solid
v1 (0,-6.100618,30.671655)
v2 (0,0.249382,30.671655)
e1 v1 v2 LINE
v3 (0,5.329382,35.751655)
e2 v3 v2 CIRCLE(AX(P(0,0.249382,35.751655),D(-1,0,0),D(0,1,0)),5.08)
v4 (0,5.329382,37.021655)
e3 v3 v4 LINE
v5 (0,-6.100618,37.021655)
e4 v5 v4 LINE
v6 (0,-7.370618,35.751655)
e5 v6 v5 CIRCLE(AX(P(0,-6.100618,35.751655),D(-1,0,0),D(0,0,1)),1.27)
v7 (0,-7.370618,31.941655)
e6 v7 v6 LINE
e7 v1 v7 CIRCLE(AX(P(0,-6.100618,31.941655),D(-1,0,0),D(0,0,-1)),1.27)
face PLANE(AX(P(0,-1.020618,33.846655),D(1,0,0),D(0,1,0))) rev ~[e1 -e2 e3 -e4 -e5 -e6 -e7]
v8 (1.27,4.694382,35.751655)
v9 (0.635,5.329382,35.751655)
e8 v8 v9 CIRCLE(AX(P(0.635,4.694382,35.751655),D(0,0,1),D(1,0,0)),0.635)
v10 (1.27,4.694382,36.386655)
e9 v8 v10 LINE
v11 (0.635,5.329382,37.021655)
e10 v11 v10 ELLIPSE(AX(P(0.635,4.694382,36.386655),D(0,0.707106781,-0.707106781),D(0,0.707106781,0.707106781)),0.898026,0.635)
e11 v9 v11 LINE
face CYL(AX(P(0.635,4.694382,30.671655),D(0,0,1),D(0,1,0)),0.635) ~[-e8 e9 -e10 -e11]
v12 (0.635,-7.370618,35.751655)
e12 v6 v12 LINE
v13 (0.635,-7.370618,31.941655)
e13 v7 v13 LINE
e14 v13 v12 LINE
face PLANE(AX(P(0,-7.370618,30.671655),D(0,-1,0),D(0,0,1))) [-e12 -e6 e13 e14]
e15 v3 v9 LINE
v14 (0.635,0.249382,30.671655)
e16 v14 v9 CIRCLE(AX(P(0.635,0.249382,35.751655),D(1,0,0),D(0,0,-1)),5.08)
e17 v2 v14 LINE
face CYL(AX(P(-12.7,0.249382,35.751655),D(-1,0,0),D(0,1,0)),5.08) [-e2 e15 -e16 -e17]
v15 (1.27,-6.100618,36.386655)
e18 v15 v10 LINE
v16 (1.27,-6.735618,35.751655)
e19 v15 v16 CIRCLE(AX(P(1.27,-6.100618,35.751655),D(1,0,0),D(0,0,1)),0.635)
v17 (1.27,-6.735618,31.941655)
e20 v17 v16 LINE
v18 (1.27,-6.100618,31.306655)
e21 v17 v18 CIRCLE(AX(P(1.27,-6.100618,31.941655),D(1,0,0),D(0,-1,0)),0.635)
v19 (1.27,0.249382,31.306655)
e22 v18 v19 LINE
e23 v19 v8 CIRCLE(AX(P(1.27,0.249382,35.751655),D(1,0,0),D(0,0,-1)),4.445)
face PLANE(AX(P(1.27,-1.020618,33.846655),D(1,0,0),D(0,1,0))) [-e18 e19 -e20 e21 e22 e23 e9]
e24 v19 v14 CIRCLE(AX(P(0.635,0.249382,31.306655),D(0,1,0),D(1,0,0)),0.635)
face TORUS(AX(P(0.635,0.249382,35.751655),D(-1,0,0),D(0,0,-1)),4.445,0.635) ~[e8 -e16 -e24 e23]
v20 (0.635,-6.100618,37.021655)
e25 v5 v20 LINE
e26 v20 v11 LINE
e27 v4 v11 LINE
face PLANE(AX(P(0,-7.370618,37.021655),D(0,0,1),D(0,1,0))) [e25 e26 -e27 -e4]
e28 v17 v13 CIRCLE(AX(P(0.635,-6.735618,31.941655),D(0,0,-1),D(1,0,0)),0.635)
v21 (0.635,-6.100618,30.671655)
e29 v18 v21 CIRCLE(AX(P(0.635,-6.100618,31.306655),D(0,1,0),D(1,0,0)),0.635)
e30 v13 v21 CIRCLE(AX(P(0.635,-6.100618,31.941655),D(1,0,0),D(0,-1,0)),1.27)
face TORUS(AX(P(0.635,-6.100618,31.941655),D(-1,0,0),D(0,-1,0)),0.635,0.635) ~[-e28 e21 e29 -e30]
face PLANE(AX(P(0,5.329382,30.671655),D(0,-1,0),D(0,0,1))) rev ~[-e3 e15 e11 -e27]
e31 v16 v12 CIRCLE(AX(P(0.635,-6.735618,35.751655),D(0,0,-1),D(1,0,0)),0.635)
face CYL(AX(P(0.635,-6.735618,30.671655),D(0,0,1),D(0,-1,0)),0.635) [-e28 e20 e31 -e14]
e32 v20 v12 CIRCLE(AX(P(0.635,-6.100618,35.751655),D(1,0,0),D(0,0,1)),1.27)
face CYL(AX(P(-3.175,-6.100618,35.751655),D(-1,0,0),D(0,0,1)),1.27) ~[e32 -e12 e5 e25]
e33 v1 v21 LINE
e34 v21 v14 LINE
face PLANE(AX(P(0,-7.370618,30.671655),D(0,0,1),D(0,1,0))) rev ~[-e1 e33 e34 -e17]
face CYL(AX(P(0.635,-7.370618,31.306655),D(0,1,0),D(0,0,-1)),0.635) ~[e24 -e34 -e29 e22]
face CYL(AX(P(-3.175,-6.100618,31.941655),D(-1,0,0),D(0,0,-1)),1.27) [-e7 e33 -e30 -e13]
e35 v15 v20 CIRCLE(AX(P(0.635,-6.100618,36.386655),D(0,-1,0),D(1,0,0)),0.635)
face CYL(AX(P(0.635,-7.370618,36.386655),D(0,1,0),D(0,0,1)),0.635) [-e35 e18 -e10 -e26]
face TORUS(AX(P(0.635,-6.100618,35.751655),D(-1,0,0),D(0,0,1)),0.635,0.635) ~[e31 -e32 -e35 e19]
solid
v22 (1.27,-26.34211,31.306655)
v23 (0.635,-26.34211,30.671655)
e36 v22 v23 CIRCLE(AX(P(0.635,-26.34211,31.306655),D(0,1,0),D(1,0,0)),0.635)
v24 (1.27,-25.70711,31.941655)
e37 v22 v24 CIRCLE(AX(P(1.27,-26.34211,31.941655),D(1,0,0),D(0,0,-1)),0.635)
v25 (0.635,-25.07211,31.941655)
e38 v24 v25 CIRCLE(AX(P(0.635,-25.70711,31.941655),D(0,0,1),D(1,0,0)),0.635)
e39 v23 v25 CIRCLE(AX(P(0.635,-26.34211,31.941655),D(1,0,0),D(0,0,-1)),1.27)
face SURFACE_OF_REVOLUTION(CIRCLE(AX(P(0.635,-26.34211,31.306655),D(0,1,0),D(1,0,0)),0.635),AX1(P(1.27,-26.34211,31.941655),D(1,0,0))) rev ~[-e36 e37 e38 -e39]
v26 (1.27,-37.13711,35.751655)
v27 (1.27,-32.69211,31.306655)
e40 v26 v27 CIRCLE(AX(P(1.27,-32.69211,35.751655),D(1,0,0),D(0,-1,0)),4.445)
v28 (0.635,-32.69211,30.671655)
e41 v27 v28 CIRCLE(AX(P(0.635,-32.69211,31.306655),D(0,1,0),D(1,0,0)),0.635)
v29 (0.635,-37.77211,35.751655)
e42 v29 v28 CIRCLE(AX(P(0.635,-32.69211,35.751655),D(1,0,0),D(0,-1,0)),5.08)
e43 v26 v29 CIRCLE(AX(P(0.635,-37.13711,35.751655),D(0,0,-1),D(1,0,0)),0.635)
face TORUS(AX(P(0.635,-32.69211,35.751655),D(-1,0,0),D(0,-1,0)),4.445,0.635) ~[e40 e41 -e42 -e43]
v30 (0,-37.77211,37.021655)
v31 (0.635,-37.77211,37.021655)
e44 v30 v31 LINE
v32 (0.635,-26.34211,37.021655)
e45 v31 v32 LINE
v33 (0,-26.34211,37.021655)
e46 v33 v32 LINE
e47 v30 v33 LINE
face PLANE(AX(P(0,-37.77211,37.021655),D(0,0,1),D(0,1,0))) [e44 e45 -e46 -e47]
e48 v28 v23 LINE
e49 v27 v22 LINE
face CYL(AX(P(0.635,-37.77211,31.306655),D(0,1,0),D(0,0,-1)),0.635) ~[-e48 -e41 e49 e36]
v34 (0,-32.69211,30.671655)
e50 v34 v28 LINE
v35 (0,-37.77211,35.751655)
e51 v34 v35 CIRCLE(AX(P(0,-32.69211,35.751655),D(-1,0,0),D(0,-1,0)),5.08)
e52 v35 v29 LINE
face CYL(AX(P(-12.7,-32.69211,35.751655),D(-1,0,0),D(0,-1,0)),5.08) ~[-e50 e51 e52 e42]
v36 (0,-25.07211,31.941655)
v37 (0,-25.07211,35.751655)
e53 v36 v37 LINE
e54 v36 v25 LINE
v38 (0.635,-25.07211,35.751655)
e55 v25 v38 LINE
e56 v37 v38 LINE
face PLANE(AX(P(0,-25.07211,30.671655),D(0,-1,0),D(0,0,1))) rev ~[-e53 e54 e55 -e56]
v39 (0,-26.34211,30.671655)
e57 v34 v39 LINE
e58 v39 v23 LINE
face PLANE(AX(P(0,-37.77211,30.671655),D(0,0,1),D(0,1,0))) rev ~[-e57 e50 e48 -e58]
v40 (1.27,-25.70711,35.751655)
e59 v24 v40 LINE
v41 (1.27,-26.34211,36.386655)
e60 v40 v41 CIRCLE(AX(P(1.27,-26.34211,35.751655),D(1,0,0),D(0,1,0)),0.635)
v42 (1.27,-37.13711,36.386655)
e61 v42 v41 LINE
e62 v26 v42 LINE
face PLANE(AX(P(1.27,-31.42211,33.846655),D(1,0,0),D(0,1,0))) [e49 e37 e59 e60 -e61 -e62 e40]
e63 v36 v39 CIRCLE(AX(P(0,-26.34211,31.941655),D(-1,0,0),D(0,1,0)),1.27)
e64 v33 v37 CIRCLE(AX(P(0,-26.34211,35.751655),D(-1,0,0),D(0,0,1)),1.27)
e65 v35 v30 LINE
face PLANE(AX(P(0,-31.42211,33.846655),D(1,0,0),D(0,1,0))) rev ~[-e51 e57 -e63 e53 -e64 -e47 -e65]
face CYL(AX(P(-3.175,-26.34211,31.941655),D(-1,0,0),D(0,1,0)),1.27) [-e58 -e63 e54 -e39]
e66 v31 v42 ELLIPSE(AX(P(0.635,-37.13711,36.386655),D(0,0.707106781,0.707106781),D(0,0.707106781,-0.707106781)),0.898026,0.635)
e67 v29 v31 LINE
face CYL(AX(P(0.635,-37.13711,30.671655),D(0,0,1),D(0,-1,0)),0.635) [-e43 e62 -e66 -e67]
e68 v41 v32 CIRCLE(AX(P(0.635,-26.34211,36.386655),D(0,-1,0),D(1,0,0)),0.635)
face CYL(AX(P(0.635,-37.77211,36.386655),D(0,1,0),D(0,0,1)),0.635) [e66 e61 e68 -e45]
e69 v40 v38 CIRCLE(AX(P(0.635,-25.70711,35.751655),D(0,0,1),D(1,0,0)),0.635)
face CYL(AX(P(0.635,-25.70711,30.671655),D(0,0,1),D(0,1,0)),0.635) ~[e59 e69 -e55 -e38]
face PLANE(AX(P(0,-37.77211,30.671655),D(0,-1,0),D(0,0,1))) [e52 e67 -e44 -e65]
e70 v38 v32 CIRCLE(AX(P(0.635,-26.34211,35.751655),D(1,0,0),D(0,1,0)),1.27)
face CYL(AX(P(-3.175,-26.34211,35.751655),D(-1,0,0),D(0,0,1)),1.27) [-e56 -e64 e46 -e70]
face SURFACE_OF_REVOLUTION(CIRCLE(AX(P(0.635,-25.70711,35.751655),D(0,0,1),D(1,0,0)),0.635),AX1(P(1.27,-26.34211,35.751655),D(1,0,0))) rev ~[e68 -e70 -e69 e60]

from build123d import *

# Parameters (mm, degrees)
F0_W        = 12.7
F0_H        = 6.35
F1_DEPTH    = 1.27
F2_R        = 0.635
F2_2_R      = 0.635
F3_T1_DEPTH = 13.97
F3_T4_ANGLE = 90
F4_T1_DEPTH = 13.97
F4_T4_ANGLE = 90
F5_T1_DEPTH = 4.445
F5_T4_ANGLE = 90
F6_T1_DEPTH = 4.445
F6_T4_ANGLE = 90
F7_T1_DEPTH = 4.445
F7_T4_ANGLE = 90
F8_T1_DEPTH = 4.445
F8_T4_ANGLE = 90


# Not quite as in the source:
# - a fillet or chamfer that OpenCascade refuses, or shapes differently, is made with other operations: its cross-section is extruded or revolved along the edge and cut away or added


with BuildPart() as f1:
    # F0 (on Right) → F1 (new body)
    with BuildSketch(Plane.YZ):
        with Locations((-31.4221102744, 33.8466549292)):
            Rectangle(F0_W, F0_H)
    extrude(amount=F1_DEPTH)

    # F2
    f2_edges = [f1.edges().sort_by_distance(p)[0] for p in [
        (1.27, -31.42211, 37.021655),
        (1.27, -25.07211, 33.846655),
        (1.27, -31.42211, 30.671655),
        (1.27, -37.77211, 33.846655),
    ]]
    fillet(f2_edges, radius=F2_R)

    # F4: fillet of radius 5.08 on 1 edges, made by hand

    # F4_s2 → F4_t1 (cut)
    with BuildSketch(Plane.YZ.offset(-12.7)):
        with BuildLine():
            ThreePointArc((-37.7721102744, 35.7516549292), (-36.2842127229, 32.1595524808), (-32.6921102744, 30.6716549292))
            Line((-32.6921102744, 30.6716549292), (-37.7721102744, 30.6716549292))
            Line((-37.7721102744, 30.6716549292), (-37.7721102744, 35.7516549292))
        make_face()
    extrude(amount=F4_T1_DEPTH, mode=Mode.SUBTRACT)

    # F4_s3 → F4_t4 (revolve, cut)
    with BuildSketch(Plane.XY.offset(35.7516549292)):
        with BuildLine():
            ThreePointArc((1.27, -37.1371102744), (1.0840128061, -37.5861230805), (0.635, -37.7721102744))
            Line((0.635, -37.7721102744), (1.27, -37.7721102744))
            Line((1.27, -37.7721102744), (1.27, -37.1371102744))
        make_face()
    revolve(axis=Axis((1.27, -32.6921102744, 35.7516549292), (1, 0, 0)), revolution_arc=F4_T4_ANGLE, mode=Mode.SUBTRACT)

    # F5: fillet of radius 1.27 on 1 edges, made by hand

    # F5_s2 → F5_t1 (cut)
    with BuildSketch(Plane.YZ.offset(-3.175)):
        with BuildLine():
            ThreePointArc((-26.3421102744, 37.0216549292), (-25.4440846623, 36.6496805413), (-25.0721102744, 35.7516549292))
            Line((-25.0721102744, 35.7516549292), (-25.0721102744, 37.0216549292))
            Line((-25.0721102744, 37.0216549292), (-26.3421102744, 37.0216549292))
        make_face()
    extrude(amount=F5_T1_DEPTH, mode=Mode.SUBTRACT)

    # F5_s3 → F5_t4 (revolve, cut)
    with BuildSketch(Plane.XY.offset(35.7516549292)):
        with BuildLine():
            ThreePointArc((1.27, -25.7071102744), (1.0840128061, -25.2580974684), (0.635, -25.0721102744))
            Line((0.635, -25.0721102744), (1.27, -25.0721102744))
            Line((1.27, -25.0721102744), (1.27, -25.7071102744))
        make_face()
    revolve(axis=Axis((1.27, -26.3421102744, 35.7516549292), (1, 0, 0)), revolution_arc=F5_T4_ANGLE, mode=Mode.SUBTRACT)

    # F7: fillet of radius 1.27 on 1 edges, made by hand

    # F7_s2 → F7_t1 (cut)
    with BuildSketch(Plane.YZ.offset(-3.175)):
        with BuildLine():
            ThreePointArc((-25.0721102744, 31.9416549292), (-25.4440846623, 31.0436293171), (-26.3421102744, 30.6716549292))
            Line((-26.3421102744, 30.6716549292), (-25.0721102744, 30.6716549292))
            Line((-25.0721102744, 30.6716549292), (-25.0721102744, 31.9416549292))
        make_face()
    extrude(amount=F7_T1_DEPTH, mode=Mode.SUBTRACT)

    # F7_s3 → F7_t4 (revolve, cut)
    with BuildSketch(Plane.XZ.offset(26.3421102744)):
        with BuildLine():
            ThreePointArc((1.27, 31.3066549292), (1.0840128061, 30.8576421232), (0.635, 30.6716549292))
            Line((0.635, 30.6716549292), (1.27, 30.6716549292))
            Line((1.27, 30.6716549292), (1.27, 31.3066549292))
        make_face()
    revolve(axis=Axis((1.27, -26.3421102744, 31.9416549292), (1, 0, 0)), revolution_arc=F7_T4_ANGLE, mode=Mode.SUBTRACT)


with BuildPart() as f1b:
    # F0 (on Right) → F1, piece 2 (new body)
    with BuildSketch(Plane.YZ):
        with Locations((-1.0206177063, 33.8466549292)):
            Rectangle(F0_W, F0_H)
    extrude(amount=F1_DEPTH)

    # F2#2
    f2_2_edges = [f1b.edges().sort_by_distance(p)[0] for p in [
        (1.27, -1.020618, 37.021655),
        (1.27, -7.370618, 33.846655),
        (1.27, -1.020618, 30.671655),
        (1.27, 5.329382, 33.846655),
    ]]
    fillet(f2_2_edges, radius=F2_2_R)

    # F3: fillet of radius 5.08 on 1 edges, made by hand

    # F3_s2 → F3_t1 (cut)
    with BuildSketch(Plane.YZ.offset(-12.7)):
        with BuildLine():
            ThreePointArc((5.3293822937, 35.7516549292), (3.8414847421, 32.1595524808), (0.2493822937, 30.6716549292))
            Line((0.2493822937, 30.6716549292), (5.3293822937, 30.6716549292))
            Line((5.3293822937, 30.6716549292), (5.3293822937, 35.7516549292))
        make_face()
    extrude(amount=F3_T1_DEPTH, mode=Mode.SUBTRACT)

    # F3_s3 → F3_t4 (revolve, cut)
    with BuildSketch(Plane.XZ.offset(-0.2493822937)):
        with BuildLine():
            ThreePointArc((1.27, 31.3066549292), (1.0840128061, 30.8576421232), (0.635, 30.6716549292))
            Line((0.635, 30.6716549292), (1.27, 30.6716549292))
            Line((1.27, 30.6716549292), (1.27, 31.3066549292))
        make_face()
    revolve(axis=Axis((1.27, 0.2493822937, 35.7516549292), (1, 0, 0)), revolution_arc=F3_T4_ANGLE, mode=Mode.SUBTRACT)

    # F6: fillet of radius 1.27 on 1 edges, made by hand

    # F6_s2 → F6_t1 (cut)
    with BuildSketch(Plane.YZ.offset(-3.175)):
        with BuildLine():
            ThreePointArc((-6.1006177063, 37.0216549292), (-6.9986433184, 36.6496805413), (-7.3706177063, 35.7516549292))
            Line((-7.3706177063, 35.7516549292), (-7.3706177063, 37.0216549292))
            Line((-7.3706177063, 37.0216549292), (-6.1006177063, 37.0216549292))
        make_face()
    extrude(amount=F6_T1_DEPTH, mode=Mode.SUBTRACT)

    # F6_s3 → F6_t4 (revolve, cut)
    with BuildSketch(Plane.XZ.offset(6.1006177063)):
        with BuildLine():
            ThreePointArc((1.27, 36.3866549292), (1.0840128061, 36.8356677353), (0.635, 37.0216549292))
            Line((0.635, 37.0216549292), (1.27, 37.0216549292))
            Line((1.27, 37.0216549292), (1.27, 36.3866549292))
        make_face()
    revolve(axis=Axis((1.27, -6.1006177063, 35.7516549292), (1, 0, 0)), revolution_arc=F6_T4_ANGLE, mode=Mode.SUBTRACT)

    # F8: fillet of radius 1.27 on 1 edges, made by hand

    # F8_s2 → F8_t1 (cut)
    with BuildSketch(Plane.YZ.offset(-3.175)):
        with BuildLine():
            ThreePointArc((-6.1006177063, 30.6716549292), (-6.9986433184, 31.0436293171), (-7.3706177063, 31.9416549292))
            Line((-7.3706177063, 31.9416549292), (-7.3706177063, 30.6716549292))
            Line((-7.3706177063, 30.6716549292), (-6.1006177063, 30.6716549292))
        make_face()
    extrude(amount=F8_T1_DEPTH, mode=Mode.SUBTRACT)

    # F8_s3 → F8_t4 (revolve, cut)
    with BuildSketch(Plane.XY.offset(31.9416549292)):
        with BuildLine():
            ThreePointArc((1.27, -6.7356177063), (1.0840128061, -7.1846305124), (0.635, -7.3706177063))
            Line((0.635, -7.3706177063), (1.27, -7.3706177063))
            Line((1.27, -7.3706177063), (1.27, -6.7356177063))
        make_face()
    revolve(axis=Axis((1.27, -6.1006177063, 31.9416549292), (1, 0, 0)), revolution_arc=F8_T4_ANGLE, mode=Mode.SUBTRACT)


solid = Compound([f1.part, f1b.part])
